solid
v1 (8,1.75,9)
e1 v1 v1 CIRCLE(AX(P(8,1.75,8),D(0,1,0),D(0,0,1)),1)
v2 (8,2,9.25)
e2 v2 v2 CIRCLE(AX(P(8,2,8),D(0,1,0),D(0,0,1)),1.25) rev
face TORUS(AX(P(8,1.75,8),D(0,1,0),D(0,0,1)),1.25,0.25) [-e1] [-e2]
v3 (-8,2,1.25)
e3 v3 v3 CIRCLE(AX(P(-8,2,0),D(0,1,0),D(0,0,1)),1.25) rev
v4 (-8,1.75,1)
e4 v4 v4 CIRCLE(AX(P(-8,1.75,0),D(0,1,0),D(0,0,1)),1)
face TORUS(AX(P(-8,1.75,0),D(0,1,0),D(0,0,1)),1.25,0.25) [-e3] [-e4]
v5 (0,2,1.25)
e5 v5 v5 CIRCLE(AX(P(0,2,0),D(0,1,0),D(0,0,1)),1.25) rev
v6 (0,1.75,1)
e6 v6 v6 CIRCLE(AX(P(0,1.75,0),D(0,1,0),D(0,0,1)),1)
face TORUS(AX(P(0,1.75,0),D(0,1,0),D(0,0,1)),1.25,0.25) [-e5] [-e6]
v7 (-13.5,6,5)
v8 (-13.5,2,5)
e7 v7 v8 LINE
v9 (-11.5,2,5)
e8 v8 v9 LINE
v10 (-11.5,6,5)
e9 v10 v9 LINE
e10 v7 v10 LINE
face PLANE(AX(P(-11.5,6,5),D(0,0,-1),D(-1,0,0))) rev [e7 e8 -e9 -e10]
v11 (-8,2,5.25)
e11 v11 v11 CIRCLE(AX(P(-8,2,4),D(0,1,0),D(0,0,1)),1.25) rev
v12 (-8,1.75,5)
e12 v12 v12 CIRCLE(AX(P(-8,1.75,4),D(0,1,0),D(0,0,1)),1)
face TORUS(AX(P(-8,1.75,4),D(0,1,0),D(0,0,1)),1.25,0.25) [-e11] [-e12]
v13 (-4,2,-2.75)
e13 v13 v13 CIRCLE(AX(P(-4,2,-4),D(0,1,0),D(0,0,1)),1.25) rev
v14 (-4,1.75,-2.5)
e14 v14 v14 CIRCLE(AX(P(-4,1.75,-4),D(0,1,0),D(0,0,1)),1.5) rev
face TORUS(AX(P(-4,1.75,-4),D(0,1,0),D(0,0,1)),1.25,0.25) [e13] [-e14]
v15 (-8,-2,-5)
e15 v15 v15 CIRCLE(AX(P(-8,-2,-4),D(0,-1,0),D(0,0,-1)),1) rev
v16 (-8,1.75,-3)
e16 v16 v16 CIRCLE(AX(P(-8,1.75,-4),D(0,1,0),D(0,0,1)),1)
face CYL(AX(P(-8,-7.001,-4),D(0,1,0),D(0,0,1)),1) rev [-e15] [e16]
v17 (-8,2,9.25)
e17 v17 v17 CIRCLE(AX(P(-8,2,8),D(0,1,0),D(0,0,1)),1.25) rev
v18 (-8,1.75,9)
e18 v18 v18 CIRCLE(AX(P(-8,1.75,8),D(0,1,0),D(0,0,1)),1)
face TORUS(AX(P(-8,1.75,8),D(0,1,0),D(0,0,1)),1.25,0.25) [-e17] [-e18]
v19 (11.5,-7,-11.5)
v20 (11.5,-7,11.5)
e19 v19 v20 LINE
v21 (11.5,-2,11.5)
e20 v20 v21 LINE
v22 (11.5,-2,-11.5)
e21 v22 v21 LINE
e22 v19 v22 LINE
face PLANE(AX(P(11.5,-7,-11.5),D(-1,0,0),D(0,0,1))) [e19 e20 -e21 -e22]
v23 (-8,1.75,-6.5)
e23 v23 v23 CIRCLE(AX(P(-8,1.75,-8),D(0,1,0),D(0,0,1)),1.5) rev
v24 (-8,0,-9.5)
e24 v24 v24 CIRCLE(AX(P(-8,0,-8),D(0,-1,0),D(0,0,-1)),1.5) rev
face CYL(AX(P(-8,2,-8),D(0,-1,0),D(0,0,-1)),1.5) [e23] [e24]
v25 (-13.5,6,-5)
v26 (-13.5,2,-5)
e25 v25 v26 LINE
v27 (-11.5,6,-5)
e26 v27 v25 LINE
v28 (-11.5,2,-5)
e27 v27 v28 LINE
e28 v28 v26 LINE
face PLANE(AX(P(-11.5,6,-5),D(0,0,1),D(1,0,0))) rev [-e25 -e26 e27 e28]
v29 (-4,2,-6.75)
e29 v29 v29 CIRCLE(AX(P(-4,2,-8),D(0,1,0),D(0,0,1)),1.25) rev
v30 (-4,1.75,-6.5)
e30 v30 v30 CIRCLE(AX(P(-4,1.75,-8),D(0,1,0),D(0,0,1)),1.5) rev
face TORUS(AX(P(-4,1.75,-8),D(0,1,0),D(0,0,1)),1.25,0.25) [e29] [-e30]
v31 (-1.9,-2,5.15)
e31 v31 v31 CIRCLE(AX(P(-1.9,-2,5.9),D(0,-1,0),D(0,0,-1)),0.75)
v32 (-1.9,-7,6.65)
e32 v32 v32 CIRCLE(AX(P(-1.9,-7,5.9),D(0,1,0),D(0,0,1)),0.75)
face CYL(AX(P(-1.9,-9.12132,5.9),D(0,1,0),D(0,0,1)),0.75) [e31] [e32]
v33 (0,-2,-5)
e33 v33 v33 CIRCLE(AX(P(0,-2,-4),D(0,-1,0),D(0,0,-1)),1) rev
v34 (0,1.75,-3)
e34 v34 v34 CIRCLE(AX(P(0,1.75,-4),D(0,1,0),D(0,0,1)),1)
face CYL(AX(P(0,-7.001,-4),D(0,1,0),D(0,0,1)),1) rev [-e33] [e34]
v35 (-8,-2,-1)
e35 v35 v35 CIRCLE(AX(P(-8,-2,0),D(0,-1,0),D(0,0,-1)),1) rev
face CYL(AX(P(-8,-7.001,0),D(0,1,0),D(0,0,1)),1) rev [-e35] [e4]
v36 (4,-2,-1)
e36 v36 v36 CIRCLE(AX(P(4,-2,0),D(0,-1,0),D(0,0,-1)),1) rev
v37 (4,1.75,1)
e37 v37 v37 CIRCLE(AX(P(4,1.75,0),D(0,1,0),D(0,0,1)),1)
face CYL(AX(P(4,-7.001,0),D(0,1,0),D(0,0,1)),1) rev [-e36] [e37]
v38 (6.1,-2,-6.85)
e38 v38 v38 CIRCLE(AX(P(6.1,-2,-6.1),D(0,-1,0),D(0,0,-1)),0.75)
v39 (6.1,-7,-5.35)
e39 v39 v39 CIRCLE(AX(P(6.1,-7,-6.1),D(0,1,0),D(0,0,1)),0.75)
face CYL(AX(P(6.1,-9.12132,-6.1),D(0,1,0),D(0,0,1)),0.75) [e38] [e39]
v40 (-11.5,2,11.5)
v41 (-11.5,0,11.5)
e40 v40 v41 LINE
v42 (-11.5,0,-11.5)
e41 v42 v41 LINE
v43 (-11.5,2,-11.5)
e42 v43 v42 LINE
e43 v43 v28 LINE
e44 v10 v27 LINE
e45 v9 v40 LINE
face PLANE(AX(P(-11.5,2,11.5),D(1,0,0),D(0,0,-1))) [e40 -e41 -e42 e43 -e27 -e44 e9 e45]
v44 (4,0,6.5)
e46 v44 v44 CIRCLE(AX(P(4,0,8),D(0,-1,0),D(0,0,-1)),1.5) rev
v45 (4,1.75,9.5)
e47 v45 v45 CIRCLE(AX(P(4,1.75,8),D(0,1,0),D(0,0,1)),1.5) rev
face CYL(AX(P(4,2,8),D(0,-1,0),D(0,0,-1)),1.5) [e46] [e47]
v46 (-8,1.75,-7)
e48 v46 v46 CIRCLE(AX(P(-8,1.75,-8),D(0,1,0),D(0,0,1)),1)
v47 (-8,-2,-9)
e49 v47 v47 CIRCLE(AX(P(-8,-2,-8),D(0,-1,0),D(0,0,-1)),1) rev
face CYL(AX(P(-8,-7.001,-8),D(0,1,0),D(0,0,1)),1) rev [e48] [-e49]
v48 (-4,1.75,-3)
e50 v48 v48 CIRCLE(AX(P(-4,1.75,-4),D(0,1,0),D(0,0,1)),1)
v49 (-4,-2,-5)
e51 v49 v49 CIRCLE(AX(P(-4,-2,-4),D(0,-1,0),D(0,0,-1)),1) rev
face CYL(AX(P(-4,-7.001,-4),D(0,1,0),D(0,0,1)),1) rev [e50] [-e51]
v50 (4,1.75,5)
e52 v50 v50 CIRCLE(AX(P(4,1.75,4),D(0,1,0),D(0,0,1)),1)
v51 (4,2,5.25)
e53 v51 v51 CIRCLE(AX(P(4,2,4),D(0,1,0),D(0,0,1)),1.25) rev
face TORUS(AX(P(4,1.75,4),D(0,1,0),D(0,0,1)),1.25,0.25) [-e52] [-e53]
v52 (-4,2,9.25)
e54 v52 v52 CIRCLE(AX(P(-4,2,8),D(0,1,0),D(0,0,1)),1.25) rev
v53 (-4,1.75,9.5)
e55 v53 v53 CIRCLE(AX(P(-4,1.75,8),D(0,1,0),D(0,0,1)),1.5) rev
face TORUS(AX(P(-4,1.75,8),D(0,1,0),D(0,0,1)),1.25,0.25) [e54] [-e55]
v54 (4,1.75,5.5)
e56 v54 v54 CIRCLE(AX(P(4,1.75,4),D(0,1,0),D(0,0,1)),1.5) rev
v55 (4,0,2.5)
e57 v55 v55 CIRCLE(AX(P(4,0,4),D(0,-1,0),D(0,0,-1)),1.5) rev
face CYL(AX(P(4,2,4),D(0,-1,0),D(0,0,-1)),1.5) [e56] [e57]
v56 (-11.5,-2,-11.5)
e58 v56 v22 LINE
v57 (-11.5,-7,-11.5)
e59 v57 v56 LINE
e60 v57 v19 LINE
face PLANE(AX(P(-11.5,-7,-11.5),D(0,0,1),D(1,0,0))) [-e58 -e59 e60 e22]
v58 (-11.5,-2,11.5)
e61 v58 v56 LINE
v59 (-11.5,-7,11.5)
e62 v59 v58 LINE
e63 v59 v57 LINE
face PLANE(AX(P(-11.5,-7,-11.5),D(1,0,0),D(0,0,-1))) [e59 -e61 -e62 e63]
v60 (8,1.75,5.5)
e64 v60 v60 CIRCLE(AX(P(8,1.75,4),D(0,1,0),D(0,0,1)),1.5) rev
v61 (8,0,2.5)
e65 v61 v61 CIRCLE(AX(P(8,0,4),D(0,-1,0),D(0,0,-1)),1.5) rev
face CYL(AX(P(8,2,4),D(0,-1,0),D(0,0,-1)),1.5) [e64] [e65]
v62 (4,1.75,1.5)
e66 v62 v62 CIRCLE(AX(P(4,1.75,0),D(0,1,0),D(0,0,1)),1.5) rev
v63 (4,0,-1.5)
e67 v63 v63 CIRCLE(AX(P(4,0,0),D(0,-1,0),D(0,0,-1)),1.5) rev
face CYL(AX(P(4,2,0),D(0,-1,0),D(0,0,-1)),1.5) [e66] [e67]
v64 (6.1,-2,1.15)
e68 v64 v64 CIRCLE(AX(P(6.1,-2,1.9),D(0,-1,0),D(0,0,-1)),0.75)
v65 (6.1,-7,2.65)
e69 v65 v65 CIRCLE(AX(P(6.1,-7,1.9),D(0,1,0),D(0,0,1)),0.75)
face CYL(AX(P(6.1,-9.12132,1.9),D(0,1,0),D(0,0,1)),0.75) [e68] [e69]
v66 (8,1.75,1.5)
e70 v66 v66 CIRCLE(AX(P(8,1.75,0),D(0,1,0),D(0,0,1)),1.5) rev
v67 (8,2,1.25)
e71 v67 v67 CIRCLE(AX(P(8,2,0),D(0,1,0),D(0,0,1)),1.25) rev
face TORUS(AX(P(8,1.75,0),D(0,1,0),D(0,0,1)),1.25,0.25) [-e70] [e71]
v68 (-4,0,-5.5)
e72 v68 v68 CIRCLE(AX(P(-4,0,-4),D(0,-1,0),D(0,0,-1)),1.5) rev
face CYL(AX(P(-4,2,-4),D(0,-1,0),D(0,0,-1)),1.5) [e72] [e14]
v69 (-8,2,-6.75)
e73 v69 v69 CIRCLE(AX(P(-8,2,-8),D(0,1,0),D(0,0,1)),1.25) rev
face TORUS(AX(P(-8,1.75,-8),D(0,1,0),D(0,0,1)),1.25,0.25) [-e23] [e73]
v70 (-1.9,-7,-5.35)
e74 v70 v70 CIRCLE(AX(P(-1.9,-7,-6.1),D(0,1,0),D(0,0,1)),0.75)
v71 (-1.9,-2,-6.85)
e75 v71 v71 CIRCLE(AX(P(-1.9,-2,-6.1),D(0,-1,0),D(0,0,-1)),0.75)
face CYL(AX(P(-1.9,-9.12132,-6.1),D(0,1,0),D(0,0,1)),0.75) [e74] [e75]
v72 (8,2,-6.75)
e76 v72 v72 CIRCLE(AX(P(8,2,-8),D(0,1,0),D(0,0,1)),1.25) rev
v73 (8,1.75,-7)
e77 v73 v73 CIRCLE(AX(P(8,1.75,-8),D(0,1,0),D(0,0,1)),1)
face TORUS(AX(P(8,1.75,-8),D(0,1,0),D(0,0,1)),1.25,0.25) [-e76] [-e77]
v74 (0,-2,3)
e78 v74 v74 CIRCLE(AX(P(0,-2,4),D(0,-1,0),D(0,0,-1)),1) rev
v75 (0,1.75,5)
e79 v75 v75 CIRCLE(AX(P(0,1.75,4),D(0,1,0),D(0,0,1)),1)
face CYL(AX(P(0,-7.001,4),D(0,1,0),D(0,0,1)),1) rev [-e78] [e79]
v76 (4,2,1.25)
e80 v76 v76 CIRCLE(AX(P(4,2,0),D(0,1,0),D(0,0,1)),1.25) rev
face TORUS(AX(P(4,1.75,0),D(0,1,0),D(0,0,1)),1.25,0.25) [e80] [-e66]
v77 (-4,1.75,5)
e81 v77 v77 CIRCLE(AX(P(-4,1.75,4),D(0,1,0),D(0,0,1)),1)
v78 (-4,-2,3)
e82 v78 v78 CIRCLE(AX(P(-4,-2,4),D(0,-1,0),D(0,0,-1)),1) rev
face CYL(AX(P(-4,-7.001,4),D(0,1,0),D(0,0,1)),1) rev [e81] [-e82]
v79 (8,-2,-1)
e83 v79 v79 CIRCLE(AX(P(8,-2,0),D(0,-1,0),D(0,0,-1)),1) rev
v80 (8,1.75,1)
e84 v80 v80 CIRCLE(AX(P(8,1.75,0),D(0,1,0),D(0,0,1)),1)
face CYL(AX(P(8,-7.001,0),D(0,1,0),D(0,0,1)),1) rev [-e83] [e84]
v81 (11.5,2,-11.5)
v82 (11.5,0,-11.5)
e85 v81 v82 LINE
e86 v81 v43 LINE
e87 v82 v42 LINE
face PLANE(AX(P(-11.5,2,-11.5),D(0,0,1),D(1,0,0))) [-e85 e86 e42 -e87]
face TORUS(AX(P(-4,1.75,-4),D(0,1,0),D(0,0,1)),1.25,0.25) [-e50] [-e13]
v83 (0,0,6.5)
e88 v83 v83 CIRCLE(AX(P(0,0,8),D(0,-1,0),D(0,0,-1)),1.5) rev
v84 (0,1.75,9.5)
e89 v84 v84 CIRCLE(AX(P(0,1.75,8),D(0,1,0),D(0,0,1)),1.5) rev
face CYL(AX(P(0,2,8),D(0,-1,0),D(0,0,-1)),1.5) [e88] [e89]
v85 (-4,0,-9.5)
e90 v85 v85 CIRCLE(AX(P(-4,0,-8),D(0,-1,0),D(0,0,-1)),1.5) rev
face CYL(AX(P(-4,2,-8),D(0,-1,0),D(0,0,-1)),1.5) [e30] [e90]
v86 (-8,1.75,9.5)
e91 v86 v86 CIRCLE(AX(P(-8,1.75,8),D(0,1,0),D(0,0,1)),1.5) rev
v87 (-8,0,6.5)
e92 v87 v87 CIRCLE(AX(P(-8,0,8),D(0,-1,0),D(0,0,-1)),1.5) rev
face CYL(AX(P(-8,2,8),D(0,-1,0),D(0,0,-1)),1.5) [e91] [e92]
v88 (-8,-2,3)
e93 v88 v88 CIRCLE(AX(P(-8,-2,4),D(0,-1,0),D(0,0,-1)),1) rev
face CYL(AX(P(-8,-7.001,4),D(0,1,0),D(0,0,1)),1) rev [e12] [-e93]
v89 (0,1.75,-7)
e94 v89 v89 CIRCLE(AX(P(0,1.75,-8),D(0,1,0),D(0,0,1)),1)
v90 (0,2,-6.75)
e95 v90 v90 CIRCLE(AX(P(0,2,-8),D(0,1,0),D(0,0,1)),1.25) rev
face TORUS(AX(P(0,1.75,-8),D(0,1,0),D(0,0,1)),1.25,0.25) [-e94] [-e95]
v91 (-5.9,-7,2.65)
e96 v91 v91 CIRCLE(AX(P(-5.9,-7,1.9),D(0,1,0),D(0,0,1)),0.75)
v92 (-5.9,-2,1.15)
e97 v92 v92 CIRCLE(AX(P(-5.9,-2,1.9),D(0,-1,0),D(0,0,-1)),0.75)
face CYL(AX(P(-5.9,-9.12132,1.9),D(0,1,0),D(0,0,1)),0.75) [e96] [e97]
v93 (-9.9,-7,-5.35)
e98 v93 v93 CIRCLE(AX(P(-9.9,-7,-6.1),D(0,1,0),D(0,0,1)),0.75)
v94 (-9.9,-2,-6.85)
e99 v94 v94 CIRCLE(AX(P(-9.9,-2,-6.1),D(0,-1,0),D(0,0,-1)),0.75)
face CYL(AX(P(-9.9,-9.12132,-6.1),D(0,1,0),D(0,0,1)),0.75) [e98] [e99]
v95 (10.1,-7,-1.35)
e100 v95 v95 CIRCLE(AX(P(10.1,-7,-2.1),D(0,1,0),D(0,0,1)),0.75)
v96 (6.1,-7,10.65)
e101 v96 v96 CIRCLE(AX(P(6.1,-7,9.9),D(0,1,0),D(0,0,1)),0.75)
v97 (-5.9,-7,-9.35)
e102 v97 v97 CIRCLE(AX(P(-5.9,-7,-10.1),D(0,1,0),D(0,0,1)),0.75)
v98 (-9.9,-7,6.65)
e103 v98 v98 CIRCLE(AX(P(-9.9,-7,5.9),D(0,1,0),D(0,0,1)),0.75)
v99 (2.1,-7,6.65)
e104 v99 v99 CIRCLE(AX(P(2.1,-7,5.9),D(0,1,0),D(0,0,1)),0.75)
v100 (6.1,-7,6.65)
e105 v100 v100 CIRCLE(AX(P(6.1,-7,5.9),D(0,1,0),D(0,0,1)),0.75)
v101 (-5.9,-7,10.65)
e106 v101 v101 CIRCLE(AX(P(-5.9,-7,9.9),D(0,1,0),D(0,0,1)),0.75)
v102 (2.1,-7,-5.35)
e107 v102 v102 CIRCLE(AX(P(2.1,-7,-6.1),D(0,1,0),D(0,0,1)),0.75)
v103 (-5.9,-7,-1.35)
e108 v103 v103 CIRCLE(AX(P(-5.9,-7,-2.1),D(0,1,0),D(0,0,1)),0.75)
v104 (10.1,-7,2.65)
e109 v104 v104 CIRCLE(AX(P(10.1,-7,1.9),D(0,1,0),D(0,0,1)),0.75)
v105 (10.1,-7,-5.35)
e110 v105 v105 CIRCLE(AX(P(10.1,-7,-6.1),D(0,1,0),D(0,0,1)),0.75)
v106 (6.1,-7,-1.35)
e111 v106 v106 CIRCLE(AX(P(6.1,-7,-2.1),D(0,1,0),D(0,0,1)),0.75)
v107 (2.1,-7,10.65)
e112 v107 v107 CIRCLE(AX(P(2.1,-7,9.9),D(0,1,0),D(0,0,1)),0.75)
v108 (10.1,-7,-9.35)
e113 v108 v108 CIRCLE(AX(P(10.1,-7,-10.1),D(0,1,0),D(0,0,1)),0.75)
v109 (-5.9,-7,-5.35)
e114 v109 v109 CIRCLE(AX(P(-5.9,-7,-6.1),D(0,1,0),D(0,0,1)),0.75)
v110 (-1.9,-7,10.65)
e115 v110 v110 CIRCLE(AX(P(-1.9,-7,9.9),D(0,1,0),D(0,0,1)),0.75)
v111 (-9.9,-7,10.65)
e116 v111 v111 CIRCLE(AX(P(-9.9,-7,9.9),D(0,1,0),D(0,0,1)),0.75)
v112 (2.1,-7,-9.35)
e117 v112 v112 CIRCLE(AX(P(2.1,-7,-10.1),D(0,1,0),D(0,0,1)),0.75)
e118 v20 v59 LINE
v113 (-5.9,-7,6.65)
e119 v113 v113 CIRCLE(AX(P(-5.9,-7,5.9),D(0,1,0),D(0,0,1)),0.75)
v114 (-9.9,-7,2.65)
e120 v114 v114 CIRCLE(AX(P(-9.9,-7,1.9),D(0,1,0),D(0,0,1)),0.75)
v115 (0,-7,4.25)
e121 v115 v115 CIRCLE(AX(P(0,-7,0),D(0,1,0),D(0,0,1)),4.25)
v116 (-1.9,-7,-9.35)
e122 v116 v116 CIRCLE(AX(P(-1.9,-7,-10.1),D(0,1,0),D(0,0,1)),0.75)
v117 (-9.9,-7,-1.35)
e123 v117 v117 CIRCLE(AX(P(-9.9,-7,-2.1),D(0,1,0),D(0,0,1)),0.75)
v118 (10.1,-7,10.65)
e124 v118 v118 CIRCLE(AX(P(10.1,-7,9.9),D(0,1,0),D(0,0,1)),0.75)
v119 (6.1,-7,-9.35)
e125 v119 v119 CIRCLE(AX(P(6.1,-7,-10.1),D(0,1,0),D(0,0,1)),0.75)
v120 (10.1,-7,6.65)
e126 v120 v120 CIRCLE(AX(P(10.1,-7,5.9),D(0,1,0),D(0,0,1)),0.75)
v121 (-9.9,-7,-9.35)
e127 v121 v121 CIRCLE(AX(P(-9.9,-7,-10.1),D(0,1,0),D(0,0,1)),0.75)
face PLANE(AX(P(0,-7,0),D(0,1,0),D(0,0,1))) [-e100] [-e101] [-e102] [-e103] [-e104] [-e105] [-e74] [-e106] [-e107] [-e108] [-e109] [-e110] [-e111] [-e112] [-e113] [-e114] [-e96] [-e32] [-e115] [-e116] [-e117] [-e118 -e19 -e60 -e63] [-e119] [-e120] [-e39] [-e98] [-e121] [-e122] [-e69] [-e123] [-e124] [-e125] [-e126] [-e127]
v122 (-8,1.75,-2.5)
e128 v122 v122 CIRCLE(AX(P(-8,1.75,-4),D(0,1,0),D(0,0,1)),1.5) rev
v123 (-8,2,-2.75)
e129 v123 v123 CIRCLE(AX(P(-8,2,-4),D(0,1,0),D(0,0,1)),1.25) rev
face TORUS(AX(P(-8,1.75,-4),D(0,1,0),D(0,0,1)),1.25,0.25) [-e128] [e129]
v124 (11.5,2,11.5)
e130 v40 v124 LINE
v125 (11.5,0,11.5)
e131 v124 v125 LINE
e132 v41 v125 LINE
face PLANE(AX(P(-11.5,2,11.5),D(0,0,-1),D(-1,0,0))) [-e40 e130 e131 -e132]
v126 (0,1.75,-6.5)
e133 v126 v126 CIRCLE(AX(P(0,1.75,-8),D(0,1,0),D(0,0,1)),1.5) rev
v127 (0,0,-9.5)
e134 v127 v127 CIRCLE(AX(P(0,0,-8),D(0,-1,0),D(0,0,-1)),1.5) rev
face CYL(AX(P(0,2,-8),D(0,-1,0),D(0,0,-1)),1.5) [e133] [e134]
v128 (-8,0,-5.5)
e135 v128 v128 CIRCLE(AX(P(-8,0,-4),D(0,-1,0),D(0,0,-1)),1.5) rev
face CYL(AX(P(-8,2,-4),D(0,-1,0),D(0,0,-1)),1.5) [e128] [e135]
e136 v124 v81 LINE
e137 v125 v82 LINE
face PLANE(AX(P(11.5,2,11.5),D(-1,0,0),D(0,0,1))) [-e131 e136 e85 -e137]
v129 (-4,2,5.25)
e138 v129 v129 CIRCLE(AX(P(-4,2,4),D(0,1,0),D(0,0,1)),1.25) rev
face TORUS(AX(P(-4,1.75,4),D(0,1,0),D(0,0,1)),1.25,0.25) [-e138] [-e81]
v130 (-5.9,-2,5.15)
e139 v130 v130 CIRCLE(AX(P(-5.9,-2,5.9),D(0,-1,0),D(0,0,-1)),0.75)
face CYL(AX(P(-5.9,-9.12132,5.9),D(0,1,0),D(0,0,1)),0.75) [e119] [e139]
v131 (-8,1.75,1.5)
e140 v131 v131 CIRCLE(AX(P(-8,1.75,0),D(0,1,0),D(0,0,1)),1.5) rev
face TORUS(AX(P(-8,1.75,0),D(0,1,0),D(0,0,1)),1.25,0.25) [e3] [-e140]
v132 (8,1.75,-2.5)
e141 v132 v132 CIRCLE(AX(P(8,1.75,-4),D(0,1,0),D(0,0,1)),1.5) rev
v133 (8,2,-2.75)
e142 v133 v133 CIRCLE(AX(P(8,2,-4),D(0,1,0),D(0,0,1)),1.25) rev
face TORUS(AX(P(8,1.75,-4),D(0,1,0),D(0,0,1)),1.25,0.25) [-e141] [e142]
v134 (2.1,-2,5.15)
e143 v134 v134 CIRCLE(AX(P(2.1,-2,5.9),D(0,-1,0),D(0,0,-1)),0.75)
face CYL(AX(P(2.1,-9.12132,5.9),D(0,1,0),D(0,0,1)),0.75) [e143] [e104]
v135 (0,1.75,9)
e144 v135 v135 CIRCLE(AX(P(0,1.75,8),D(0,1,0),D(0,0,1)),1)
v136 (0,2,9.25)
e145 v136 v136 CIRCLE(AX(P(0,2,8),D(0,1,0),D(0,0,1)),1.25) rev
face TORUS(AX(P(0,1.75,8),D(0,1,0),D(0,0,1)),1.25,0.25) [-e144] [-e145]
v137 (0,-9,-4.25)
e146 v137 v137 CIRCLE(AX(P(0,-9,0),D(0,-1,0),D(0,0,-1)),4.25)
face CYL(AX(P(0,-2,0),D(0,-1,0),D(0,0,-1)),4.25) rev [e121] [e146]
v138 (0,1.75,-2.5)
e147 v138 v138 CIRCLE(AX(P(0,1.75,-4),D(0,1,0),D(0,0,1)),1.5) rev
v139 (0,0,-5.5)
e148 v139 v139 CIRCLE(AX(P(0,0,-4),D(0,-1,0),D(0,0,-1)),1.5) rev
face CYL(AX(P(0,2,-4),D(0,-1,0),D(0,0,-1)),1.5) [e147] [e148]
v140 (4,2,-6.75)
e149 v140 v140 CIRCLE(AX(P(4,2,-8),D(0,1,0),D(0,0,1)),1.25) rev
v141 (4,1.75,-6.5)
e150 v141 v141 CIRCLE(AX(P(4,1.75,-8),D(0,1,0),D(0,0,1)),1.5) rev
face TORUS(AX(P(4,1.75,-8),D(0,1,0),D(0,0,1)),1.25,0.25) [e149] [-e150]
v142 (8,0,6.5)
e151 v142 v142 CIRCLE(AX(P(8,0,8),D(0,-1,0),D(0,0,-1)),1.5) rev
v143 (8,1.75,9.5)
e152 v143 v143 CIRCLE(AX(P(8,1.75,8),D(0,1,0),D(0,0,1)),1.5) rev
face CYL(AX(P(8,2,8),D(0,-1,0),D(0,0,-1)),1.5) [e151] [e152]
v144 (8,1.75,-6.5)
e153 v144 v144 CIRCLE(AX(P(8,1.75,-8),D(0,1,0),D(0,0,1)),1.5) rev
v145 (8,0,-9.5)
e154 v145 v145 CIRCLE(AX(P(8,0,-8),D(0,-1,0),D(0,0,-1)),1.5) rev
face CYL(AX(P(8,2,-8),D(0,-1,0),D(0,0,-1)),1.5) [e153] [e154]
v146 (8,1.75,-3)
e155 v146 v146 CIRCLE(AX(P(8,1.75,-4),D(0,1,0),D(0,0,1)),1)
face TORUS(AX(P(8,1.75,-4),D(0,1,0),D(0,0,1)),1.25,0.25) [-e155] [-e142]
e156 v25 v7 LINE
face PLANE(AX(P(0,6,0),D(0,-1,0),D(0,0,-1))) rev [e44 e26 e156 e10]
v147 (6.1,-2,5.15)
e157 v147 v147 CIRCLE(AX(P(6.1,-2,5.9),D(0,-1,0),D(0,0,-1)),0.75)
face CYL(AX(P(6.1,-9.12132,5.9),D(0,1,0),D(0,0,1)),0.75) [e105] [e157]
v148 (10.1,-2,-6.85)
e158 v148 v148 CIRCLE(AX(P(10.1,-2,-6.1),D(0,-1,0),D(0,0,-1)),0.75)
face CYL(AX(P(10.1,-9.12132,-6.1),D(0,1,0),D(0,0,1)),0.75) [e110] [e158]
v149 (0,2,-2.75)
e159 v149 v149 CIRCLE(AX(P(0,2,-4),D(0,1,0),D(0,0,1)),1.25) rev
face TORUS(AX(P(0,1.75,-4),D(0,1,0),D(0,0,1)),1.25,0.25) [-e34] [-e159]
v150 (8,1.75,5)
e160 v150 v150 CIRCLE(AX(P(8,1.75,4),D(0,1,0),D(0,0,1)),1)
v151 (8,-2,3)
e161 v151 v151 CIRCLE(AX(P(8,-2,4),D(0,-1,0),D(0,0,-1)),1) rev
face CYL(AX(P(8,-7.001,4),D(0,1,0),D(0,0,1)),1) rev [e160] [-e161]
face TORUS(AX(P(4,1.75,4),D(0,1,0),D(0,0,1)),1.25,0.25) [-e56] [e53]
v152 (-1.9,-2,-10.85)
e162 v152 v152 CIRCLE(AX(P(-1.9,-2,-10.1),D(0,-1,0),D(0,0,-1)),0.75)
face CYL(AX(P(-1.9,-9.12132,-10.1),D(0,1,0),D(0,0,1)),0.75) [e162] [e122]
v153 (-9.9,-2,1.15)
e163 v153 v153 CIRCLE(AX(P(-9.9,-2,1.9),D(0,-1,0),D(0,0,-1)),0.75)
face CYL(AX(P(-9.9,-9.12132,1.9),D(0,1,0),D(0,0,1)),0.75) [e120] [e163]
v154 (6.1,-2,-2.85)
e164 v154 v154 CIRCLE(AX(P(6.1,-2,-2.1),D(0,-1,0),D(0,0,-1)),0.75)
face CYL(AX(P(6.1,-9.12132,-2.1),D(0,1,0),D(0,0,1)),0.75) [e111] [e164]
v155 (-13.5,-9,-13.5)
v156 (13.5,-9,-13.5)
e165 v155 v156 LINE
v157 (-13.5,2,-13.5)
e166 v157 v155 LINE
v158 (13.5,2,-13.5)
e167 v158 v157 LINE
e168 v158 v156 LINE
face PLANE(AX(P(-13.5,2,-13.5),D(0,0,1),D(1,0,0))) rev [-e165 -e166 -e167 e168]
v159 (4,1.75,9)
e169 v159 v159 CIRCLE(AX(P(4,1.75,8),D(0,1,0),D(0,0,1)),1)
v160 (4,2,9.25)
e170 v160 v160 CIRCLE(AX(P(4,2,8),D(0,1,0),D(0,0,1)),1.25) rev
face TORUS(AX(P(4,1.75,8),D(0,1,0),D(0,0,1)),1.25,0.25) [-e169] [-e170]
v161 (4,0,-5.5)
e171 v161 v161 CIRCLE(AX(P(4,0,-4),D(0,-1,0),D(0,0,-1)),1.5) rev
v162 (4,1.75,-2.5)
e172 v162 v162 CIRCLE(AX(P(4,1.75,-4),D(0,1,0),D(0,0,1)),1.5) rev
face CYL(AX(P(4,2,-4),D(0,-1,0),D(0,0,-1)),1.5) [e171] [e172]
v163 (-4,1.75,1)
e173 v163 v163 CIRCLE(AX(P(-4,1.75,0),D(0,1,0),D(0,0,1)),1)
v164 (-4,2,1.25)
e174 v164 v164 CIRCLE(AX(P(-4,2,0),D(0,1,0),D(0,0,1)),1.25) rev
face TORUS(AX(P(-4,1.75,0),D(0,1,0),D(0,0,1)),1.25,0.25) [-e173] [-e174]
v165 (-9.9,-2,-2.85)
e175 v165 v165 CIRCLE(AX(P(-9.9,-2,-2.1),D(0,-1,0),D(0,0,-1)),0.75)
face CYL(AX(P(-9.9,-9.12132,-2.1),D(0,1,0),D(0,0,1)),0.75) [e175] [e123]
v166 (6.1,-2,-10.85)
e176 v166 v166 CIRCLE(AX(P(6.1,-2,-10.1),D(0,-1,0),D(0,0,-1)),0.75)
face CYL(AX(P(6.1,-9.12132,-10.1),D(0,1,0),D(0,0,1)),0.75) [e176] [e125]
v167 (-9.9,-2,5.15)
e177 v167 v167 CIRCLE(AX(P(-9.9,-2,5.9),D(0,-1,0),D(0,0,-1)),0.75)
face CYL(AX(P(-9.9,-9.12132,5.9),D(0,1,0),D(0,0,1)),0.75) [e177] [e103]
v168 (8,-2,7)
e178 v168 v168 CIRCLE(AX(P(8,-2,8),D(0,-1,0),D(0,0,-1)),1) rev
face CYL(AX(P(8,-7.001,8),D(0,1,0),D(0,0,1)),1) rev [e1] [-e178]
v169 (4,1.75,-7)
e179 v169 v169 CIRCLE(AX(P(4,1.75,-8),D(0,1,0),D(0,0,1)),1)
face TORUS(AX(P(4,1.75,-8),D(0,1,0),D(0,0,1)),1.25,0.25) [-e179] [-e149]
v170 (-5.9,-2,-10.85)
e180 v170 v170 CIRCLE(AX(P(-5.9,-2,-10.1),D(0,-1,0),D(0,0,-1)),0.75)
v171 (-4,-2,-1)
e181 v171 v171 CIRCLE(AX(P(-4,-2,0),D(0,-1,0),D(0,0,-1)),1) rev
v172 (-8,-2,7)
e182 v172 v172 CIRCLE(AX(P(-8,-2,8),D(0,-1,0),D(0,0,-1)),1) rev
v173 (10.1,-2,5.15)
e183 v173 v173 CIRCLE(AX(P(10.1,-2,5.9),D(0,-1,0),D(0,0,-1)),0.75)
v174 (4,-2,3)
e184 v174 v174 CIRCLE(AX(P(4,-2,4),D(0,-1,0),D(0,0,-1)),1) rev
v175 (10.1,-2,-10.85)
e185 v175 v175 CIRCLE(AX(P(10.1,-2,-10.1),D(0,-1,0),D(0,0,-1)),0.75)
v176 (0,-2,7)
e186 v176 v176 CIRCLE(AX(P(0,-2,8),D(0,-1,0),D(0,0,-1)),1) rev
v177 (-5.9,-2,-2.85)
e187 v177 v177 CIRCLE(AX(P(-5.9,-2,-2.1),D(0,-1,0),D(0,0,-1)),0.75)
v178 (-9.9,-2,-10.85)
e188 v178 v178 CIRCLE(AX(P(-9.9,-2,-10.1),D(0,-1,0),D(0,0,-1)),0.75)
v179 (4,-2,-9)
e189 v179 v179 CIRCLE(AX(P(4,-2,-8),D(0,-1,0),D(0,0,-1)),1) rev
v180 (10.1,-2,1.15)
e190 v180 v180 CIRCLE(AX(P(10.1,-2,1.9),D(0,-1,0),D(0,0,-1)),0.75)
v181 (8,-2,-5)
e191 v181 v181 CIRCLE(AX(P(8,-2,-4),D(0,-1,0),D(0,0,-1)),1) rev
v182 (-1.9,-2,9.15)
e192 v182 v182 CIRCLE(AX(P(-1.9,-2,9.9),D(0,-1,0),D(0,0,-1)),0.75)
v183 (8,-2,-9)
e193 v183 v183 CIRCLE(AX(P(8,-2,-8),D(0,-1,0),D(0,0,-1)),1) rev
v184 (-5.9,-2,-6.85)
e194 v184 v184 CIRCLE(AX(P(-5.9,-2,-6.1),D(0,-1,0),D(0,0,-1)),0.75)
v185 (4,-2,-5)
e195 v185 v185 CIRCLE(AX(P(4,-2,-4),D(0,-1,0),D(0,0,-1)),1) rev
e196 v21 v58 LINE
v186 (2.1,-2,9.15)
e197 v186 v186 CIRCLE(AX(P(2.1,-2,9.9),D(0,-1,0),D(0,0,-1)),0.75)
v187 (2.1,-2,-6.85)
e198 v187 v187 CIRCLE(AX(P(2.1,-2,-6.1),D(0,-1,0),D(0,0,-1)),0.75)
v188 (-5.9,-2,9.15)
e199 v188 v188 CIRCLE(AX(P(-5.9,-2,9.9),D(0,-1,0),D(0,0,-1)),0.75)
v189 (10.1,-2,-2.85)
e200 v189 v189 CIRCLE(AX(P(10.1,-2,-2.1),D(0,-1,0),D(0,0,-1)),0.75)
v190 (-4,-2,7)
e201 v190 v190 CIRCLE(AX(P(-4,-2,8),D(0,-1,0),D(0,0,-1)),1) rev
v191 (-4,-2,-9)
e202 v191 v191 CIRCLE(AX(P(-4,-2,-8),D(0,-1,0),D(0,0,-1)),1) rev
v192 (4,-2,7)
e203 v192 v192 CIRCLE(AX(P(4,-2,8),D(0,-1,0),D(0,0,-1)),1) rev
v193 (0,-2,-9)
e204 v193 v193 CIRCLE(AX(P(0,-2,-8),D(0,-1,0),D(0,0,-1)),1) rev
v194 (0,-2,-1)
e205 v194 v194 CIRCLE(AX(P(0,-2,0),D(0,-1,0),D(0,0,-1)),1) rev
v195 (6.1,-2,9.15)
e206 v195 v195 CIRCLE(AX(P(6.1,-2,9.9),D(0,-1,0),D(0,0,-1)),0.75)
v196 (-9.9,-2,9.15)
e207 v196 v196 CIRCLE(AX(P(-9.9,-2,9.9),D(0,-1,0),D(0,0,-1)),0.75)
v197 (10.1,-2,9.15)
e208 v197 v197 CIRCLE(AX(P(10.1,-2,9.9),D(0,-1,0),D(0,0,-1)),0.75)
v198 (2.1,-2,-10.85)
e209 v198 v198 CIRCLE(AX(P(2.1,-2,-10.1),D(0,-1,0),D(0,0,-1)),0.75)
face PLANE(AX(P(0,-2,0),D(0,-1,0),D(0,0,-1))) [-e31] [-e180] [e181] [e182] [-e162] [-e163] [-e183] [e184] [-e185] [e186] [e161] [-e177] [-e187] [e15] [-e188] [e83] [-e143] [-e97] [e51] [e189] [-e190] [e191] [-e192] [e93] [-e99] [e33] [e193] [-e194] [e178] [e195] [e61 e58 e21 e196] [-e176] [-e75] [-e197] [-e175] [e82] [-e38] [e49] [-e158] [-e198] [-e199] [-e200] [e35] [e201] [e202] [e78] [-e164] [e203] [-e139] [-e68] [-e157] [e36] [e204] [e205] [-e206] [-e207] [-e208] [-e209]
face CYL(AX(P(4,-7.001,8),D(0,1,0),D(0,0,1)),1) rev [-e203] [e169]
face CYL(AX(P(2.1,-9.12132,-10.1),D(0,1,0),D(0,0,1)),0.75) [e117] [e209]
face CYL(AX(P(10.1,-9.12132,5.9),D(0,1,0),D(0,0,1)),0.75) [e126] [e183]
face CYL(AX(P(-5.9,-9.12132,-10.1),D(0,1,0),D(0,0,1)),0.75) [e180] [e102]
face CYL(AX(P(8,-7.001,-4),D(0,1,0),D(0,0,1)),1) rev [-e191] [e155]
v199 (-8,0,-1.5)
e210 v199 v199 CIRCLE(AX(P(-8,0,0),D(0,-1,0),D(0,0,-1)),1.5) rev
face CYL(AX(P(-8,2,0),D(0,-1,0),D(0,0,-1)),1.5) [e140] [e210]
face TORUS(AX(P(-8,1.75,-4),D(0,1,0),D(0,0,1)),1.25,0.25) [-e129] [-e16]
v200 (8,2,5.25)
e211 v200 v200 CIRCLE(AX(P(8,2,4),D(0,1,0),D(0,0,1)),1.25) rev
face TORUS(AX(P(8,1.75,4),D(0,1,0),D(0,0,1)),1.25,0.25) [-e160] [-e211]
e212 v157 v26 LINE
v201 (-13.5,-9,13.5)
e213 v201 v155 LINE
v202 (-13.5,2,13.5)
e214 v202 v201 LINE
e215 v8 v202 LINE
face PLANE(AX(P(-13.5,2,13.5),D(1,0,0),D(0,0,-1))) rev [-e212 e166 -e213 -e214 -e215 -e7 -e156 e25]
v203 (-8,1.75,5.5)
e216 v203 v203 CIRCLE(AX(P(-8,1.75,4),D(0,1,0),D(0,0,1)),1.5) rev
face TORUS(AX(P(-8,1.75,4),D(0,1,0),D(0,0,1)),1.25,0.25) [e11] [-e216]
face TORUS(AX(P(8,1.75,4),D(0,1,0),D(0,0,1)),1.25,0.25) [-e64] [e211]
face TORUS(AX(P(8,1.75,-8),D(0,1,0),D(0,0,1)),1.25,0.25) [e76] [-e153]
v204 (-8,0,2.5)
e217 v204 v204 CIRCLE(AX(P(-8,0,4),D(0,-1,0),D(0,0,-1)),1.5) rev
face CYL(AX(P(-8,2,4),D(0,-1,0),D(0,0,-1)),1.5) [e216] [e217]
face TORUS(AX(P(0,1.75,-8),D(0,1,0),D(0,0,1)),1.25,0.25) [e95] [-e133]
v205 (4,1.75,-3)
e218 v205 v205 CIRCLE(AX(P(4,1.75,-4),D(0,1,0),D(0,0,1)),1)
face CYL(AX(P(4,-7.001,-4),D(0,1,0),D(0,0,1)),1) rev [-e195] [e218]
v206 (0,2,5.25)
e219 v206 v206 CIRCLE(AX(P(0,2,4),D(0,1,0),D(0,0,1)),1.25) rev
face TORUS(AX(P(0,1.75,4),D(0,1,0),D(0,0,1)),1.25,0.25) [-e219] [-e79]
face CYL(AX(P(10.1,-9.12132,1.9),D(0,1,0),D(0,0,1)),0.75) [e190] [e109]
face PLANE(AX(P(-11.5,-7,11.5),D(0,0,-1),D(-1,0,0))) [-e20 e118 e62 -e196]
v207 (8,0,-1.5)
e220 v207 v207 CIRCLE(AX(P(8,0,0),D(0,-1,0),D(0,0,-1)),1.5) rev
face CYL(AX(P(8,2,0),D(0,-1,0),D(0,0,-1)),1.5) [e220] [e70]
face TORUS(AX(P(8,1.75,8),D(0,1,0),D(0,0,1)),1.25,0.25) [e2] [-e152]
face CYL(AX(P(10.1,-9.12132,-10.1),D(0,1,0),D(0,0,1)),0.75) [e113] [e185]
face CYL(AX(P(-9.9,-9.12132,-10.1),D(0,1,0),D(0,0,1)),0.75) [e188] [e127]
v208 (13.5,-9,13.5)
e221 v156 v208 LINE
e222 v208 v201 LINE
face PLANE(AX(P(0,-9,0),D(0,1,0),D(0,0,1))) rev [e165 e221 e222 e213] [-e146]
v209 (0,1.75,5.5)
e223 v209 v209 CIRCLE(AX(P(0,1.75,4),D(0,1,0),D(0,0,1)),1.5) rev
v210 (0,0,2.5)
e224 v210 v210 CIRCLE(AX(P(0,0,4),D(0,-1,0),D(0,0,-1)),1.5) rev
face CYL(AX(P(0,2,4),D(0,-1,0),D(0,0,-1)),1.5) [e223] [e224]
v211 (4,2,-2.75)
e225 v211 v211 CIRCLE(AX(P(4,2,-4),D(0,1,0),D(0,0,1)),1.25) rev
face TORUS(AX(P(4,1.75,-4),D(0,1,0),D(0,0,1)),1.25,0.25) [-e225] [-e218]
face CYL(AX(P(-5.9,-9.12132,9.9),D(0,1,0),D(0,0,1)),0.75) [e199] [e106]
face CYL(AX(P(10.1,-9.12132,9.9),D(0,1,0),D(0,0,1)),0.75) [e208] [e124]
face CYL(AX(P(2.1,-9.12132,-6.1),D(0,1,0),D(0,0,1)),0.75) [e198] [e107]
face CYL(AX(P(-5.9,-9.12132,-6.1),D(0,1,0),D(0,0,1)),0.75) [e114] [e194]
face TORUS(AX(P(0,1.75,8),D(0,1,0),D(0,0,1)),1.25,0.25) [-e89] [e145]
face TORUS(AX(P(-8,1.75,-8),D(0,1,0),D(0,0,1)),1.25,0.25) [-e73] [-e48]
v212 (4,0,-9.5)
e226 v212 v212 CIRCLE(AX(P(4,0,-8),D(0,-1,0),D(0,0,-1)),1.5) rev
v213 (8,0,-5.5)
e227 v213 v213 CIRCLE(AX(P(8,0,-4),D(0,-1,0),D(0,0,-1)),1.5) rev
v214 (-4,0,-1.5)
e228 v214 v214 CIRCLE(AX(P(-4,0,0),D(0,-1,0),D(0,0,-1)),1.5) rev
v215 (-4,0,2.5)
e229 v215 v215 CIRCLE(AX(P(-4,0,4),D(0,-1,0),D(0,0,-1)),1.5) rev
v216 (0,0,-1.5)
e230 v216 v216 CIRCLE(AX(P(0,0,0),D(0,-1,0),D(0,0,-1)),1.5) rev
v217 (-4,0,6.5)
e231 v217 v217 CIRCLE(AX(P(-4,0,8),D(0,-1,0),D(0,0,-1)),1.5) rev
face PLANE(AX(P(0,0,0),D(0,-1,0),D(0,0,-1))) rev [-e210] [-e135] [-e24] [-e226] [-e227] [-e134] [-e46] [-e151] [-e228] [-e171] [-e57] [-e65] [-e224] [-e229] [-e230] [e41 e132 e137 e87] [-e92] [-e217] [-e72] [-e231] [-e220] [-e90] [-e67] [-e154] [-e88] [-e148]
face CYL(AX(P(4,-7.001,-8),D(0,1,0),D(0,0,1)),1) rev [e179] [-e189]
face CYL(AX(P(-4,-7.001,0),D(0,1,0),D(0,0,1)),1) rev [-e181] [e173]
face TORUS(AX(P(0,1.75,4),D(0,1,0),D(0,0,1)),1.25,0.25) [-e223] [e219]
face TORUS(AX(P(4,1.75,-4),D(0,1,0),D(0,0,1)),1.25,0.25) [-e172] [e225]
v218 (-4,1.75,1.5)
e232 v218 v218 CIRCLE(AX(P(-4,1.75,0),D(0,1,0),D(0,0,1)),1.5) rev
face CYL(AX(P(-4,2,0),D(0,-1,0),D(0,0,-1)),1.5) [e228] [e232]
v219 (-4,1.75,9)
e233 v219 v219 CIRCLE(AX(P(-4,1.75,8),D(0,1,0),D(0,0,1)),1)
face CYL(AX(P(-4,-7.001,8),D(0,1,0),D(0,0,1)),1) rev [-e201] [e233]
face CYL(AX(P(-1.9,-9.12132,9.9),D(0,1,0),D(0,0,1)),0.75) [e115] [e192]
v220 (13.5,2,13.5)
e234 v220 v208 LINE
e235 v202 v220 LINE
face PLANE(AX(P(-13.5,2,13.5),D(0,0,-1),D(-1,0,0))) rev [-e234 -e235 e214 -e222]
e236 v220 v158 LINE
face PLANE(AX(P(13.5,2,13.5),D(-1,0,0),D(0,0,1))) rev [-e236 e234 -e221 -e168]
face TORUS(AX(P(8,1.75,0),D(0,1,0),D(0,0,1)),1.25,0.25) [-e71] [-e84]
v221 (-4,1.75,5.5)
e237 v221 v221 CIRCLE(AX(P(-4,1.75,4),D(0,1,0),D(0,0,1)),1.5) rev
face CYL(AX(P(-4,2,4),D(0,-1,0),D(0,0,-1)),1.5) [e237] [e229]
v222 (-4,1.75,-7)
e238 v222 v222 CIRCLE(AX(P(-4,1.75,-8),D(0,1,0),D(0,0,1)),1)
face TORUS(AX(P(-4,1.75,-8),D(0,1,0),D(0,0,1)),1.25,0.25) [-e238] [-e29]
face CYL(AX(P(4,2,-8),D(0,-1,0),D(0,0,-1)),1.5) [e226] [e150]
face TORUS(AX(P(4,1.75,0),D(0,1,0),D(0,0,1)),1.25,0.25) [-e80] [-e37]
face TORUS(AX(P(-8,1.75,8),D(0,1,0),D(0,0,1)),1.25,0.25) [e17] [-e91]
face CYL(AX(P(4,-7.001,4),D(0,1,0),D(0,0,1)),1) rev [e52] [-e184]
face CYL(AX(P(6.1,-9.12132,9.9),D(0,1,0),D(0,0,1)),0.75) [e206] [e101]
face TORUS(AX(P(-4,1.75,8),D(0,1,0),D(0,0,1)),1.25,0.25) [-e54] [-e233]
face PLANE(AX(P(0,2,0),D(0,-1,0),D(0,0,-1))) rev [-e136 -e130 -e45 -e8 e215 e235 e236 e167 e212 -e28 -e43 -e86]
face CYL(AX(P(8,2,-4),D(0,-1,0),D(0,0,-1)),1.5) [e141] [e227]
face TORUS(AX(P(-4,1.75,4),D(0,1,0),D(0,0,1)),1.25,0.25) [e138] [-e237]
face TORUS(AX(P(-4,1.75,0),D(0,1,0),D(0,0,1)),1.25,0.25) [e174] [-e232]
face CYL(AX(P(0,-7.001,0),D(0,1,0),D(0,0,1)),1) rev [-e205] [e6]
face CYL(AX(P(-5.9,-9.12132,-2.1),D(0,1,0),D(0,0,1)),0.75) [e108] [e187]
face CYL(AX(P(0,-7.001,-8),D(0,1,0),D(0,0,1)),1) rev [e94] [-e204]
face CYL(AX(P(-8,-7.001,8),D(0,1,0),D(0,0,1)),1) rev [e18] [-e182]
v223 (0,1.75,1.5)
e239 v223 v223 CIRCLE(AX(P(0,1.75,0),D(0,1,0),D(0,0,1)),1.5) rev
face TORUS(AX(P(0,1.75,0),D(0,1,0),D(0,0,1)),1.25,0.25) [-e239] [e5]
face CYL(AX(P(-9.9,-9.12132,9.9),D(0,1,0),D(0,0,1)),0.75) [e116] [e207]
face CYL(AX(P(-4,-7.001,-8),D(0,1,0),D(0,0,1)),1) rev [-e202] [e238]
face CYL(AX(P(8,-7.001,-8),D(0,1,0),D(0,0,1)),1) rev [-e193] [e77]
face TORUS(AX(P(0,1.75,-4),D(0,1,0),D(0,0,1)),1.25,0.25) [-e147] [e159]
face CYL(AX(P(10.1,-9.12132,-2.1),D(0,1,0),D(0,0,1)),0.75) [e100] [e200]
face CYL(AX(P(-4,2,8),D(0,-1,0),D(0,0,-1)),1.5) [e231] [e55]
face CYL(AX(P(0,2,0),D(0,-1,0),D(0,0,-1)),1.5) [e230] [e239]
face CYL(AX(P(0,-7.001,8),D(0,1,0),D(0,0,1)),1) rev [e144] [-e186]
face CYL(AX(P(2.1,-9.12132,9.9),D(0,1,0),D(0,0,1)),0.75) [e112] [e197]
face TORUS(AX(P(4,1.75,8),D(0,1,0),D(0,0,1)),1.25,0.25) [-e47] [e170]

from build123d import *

# Parameters (mm, degrees)
SKETCH1_W              = 27
SKETCH1_H              = 27
SKETCH1_W_2            = 23
SKETCH1_H_2            = 23
BOSS_EXTRUDE1_DEPTH    = 2
SKETCH2_W              = 27
SKETCH2_H              = 27
BOSS_EXTRUDE2_DEPTH    = 2
SKETCH3_W              = 27
SKETCH3_H              = 27
SKETCH3_W_2            = 23
SKETCH3_H_2            = 23
BOSS_EXTRUDE3_DEPTH    = 5
SKETCH6_R              = 1.5
BOSS_EXTRUDE5_DEPTH    = 2
CUT_EXTRUDE2_REACH     = 23.107
SKETCH7_R              = 1
FILLET1_R              = 0.25
LPATTERN3_COUNT        = 5
LPATTERN3_PITCH        = 4
LPATTERN3_COUNT_DIR2   = 5
LPATTERN3_PITCH_DIR2   = 4
FILLET1_OF_LPATTERN3_R = 0.25
SKETCH11_R             = 0.75
BOSS_EXTRUDE8_DEPTH    = 5
LPATTERN2_COUNT        = 6
LPATTERN2_PITCH        = 4
LPATTERN2_COUNT_DIR2   = 6
LPATTERN2_PITCH_DIR2   = 4
SKETCH8_W              = 27
SKETCH8_H              = 27
BOSS_EXTRUDE6_DEPTH    = 2
SKETCH9_R              = 4.25
CUT_EXTRUDE3_DEPTH     = 7
SKETCH10_W             = 2
SKETCH10_H             = 10
BOSS_EXTRUDE7_DEPTH    = 4


with BuildPart() as part:
    # Sketch1 → Boss-Extrude1 (new body)
    with BuildSketch(Plane(origin=(0, 0, 0), x_dir=(1, 0, 0), z_dir=(0, 1, 0))):
        Rectangle(SKETCH1_W, SKETCH1_H)
        Rectangle(SKETCH1_W_2, SKETCH1_H_2, mode=Mode.SUBTRACT)
    extrude(amount=BOSS_EXTRUDE1_DEPTH)

    # Sketch2 → Boss-Extrude2 (add)
    with BuildSketch(Plane.XZ):
        Rectangle(SKETCH2_W, SKETCH2_H)
    extrude(amount=BOSS_EXTRUDE2_DEPTH)

    # Sketch3 → Boss-Extrude3 (add)
    with BuildSketch(Plane.XZ.offset(2)):
        Rectangle(SKETCH3_W, SKETCH3_H)
        Rectangle(SKETCH3_W_2, SKETCH3_H_2, mode=Mode.SUBTRACT)
    extrude(amount=BOSS_EXTRUDE3_DEPTH)

    # Sketch6 → Boss-Extrude5 (add)
    with BuildSketch(Plane(origin=(0, 0, 0), x_dir=(1, 0, 0), z_dir=(0, 1, 0))):
        with Locations(Location((8, 8, 0), (0, 0, 90))):
            Circle(SKETCH6_R)
    boss_extrude5 = extrude(amount=BOSS_EXTRUDE5_DEPTH)

    # Sketch7 → Cut-Extrude2 (cut, up to next)
    with BuildSketch(Plane(origin=(0, 2, 0), x_dir=(1, 0, 0), z_dir=(0, 1, 0)), mode=Mode.PRIVATE) as cut_extrude2_sk1:
        with Locations(Location((8, 8, 0), (0, 0, 270))):
            Circle(SKETCH7_R)
    cut_extrude2_tool1 = extrude(cut_extrude2_sk1.sketch, amount=-CUT_EXTRUDE2_REACH, mode=Mode.PRIVATE) & part.part
    cut_extrude2 = cut_extrude2_tool1.solids().sort_by_distance((8, 2, -8))[0]
    add(cut_extrude2, mode=Mode.SUBTRACT)

    # Fillet1
    fillet1_edges = [part.edges().sort_by_distance(p)[0] for p in [
        (8, 2, -6.5),
        (8, 2, -9),
    ]]
    fillet(fillet1_edges, radius=FILLET1_R - 0.0001)  # a hair under: the kernel refuses the full size

    # LPattern3: Boss-Extrude5, Cut-Extrude2 5 × 5
    with Locations(*[(-j * LPATTERN3_PITCH_DIR2, 0, i * LPATTERN3_PITCH) for i in range(LPATTERN3_COUNT) for j in range(LPATTERN3_COUNT_DIR2) if (i, j) != (0, 0)]):
        add(boss_extrude5)
        add(cut_extrude2, mode=Mode.SUBTRACT)

    # Fillet1 of LPattern3
    fillet1_of_lpattern3_edges = [part.edges().sort_by_distance(p)[0] for p in [
        (4, 2, -6.5),
        (4, 2, -9),
        (0, 2, -6.5),
        (0, 2, -9),
        (-4, 2, -6.5),
        (-4, 2, -9),
        (-8, 2, -6.5),
        (-8, 2, -9),
        (8, 2, -2.5),
        (8, 2, -5),
        (4, 2, -2.5),
        (4, 2, -5),
        (0, 2, -2.5),
        (0, 2, -5),
        (-4, 2, -2.5),
        (-4, 2, -5),
        (-8, 2, -2.5),
        (-8, 2, -5),
        (8, 2, 1.5),
        (8, 2, -1),
        (4, 2, 1.5),
        (4, 2, -1),
        (0, 2, 1.5),
        (0, 2, -1),
        (-4, 2, 1.5),
        (-4, 2, -1),
        (-8, 2, 1.5),
        (-8, 2, -1),
        (8, 2, 5.5),
        (8, 2, 3),
        (4, 2, 5.5),
        (4, 2, 3),
        (0, 2, 5.5),
        (0, 2, 3),
        (-4, 2, 5.5),
        (-4, 2, 3),
        (-8, 2, 5.5),
        (-8, 2, 3),
        (8, 2, 9.5),
        (8, 2, 7),
        (4, 2, 9.5),
        (4, 2, 7),
        (0, 2, 9.5),
        (0, 2, 7),
        (-4, 2, 9.5),
        (-4, 2, 7),
        (-8, 2, 9.5),
        (-8, 2, 7),
    ]]
    fillet(fillet1_of_lpattern3_edges, radius=FILLET1_OF_LPATTERN3_R - 0.0001)  # a hair under: the kernel refuses the full size

    # Sketch11 → Boss-Extrude8 (add)
    with BuildSketch(Plane.XZ.offset(2)):
        with Locations(Location((-9.9, 9.9, 0), (0, 0, 90))):
            Circle(SKETCH11_R)
    boss_extrude8 = extrude(amount=BOSS_EXTRUDE8_DEPTH)

    # LPattern2: Boss-Extrude8 6 × 6
    with Locations(*[(i * LPATTERN2_PITCH, 0, -j * LPATTERN2_PITCH_DIR2) for i in range(LPATTERN2_COUNT) for j in range(LPATTERN2_COUNT_DIR2) if (i, j) != (0, 0)]):
        add(boss_extrude8)

    # Sketch8 → Boss-Extrude6 (add)
    with BuildSketch(Plane.XZ.offset(7)):
        Rectangle(SKETCH8_W, SKETCH8_H)
    extrude(amount=BOSS_EXTRUDE6_DEPTH)

    # Sketch9 → Cut-Extrude3 (cut)
    with BuildSketch(Plane.XZ.offset(9)):
        with Locations(Location((0, 0, 0), (0, 0, 270))):
            Circle(SKETCH9_R)
    extrude(amount=-CUT_EXTRUDE3_DEPTH, mode=Mode.SUBTRACT)

    # Sketch10 → Boss-Extrude7 (add)
    with BuildSketch(Plane(origin=(0, 2, 0), x_dir=(1, 0, 0), z_dir=(0, 1, 0))):
        with Locations((-12.5, 0)):
            Rectangle(SKETCH10_W, SKETCH10_H)
    extrude(amount=BOSS_EXTRUDE7_DEPTH)


solid = part.part
